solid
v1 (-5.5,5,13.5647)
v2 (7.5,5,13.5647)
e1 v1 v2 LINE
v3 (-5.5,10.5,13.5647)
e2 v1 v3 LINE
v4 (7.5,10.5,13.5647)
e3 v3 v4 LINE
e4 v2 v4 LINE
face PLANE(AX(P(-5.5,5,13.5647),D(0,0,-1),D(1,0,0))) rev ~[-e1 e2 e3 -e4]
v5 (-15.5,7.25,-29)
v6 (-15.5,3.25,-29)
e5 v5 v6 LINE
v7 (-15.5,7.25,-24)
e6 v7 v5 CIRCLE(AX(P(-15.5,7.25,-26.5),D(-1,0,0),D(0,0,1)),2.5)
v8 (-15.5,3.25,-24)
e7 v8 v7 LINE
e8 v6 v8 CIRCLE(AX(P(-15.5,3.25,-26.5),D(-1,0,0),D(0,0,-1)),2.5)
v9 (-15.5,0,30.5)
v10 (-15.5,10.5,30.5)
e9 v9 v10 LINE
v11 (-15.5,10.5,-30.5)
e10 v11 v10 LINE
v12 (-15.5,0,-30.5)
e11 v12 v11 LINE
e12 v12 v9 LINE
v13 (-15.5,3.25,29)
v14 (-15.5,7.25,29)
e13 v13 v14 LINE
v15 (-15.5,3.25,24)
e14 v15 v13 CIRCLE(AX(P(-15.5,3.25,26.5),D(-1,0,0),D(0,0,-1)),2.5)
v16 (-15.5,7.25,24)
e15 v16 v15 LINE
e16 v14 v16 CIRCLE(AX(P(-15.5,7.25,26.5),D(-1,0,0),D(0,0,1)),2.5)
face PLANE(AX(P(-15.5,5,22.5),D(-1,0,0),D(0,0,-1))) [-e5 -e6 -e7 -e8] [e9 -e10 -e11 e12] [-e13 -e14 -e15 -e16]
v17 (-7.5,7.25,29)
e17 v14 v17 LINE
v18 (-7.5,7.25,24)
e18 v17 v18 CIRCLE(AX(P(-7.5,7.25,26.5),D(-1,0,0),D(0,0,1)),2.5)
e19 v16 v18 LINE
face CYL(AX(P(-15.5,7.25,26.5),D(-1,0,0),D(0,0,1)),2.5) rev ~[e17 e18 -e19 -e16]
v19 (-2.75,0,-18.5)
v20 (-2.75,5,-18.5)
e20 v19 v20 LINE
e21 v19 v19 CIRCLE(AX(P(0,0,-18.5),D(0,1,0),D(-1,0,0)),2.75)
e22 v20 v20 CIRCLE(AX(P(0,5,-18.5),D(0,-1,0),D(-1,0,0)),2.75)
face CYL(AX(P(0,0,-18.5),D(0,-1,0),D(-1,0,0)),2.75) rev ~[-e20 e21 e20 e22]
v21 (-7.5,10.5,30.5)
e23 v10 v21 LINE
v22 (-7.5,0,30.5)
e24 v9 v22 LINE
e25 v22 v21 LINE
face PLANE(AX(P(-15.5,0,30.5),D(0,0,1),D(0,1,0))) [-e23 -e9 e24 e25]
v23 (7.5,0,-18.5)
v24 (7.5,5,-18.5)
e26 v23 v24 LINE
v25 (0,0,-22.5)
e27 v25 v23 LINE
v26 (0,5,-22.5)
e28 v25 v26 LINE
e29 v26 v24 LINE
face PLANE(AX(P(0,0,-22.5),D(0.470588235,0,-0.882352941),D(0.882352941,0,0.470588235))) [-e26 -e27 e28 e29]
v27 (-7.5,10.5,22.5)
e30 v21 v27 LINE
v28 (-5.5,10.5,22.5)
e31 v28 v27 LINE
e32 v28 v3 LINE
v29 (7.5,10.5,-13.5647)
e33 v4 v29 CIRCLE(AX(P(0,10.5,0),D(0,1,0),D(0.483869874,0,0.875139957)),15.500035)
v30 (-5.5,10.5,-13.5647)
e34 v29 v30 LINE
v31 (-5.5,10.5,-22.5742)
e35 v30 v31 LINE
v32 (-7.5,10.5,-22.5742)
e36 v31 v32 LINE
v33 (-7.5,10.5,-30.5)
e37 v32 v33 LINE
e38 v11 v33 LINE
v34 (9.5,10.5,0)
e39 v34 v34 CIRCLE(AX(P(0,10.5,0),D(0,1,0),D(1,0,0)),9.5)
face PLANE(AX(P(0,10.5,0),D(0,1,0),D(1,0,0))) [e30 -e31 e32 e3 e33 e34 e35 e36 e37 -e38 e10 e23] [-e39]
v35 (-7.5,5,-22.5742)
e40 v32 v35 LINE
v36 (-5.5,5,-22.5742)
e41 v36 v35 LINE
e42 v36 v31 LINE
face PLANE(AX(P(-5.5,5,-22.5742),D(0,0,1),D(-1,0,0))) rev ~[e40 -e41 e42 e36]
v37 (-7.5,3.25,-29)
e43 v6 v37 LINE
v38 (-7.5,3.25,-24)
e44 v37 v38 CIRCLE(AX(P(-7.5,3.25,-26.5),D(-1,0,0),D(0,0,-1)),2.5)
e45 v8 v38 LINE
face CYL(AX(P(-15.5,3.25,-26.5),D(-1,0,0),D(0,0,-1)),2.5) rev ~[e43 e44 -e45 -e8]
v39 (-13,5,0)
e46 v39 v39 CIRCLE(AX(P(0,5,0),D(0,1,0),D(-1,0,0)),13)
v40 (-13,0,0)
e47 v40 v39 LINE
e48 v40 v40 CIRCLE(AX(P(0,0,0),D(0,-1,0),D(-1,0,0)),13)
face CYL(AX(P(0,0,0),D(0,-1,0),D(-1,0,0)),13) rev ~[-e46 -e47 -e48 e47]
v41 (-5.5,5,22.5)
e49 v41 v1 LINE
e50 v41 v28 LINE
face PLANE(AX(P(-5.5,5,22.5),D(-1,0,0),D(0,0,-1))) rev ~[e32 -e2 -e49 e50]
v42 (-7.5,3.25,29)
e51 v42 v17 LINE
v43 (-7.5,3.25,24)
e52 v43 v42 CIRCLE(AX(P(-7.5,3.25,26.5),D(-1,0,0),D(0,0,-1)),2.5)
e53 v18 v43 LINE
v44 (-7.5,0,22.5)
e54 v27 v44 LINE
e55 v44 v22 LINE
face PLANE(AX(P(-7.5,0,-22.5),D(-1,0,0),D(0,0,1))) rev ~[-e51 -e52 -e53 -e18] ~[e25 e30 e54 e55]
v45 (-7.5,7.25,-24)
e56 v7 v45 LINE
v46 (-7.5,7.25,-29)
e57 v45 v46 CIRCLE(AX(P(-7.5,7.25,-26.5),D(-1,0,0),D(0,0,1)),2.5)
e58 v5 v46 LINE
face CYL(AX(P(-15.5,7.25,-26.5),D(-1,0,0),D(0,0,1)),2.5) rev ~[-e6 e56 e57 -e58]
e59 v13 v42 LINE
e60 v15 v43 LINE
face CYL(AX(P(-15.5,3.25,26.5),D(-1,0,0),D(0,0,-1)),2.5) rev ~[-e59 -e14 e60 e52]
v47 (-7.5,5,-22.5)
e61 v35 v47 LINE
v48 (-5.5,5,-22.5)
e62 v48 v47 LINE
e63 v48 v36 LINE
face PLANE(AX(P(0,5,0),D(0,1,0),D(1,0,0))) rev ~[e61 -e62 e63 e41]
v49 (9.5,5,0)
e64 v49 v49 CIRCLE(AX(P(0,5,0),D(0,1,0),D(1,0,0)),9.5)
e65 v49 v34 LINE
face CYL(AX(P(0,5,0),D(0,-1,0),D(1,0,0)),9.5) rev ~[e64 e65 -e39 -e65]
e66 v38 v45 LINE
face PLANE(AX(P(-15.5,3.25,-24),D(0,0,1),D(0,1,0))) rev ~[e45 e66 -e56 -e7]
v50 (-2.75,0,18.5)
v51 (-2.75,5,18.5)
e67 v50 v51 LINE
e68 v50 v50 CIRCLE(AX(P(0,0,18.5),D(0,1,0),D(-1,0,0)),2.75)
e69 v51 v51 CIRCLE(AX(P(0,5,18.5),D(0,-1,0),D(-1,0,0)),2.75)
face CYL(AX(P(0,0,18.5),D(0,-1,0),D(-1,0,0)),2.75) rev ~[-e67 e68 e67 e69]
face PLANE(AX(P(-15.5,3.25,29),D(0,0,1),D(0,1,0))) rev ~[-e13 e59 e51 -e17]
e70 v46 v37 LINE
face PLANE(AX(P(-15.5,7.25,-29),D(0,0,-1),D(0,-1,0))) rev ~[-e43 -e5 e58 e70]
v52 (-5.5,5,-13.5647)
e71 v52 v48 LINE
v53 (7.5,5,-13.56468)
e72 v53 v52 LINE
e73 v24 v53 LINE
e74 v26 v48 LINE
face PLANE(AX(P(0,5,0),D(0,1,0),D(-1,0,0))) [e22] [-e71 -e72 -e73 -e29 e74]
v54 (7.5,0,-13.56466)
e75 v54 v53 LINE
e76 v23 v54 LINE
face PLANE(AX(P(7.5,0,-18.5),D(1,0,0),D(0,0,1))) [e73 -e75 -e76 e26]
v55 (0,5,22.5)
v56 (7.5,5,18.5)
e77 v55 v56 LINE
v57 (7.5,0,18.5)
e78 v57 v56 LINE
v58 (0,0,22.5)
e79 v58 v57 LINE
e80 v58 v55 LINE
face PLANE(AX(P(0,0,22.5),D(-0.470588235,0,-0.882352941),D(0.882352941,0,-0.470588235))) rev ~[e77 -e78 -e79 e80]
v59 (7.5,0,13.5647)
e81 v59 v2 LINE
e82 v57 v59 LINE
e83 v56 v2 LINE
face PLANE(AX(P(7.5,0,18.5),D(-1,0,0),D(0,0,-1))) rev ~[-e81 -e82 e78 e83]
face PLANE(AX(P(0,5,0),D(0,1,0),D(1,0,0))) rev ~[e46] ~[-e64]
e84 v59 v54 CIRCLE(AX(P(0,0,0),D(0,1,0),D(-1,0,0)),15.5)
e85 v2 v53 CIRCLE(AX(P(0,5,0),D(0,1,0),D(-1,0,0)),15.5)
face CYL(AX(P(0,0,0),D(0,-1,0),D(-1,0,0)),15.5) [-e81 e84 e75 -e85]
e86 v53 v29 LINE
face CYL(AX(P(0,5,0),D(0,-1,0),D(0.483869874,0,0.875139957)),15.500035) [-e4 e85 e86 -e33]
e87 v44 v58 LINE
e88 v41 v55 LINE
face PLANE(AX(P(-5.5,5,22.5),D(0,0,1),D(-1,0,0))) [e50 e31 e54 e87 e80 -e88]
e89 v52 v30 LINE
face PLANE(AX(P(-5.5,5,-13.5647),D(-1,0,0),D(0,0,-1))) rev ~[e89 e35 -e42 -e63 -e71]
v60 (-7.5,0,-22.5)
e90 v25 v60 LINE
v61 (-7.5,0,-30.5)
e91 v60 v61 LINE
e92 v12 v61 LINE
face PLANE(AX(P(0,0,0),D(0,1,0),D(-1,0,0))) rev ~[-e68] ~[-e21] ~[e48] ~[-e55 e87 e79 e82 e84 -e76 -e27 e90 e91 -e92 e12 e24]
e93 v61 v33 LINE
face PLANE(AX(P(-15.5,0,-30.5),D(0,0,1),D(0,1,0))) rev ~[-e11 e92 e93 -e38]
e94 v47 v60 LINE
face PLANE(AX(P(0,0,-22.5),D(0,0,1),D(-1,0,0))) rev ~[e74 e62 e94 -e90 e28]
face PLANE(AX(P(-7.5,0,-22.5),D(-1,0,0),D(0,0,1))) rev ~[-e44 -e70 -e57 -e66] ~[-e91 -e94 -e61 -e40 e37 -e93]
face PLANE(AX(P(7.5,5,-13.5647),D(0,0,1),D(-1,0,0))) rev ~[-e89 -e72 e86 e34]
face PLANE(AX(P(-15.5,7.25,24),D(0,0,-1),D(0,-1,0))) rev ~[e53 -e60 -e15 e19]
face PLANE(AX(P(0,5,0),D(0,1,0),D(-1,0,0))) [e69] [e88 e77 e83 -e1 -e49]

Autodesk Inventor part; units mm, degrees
ref_plane "YZ Plane" through (0, 0, 0) normal (1, 0, 0) x (0, 1, 0)
ref_plane "XZ Plane" through (0, 0, 0) normal (0, 1, 0) x (-1, 0, 0)
ref_plane "XY Plane" through (0, 0, 0) normal (0, 0, 1) x (1, 0, 0)
sketch "Sketch1" plane through (0, 0, 0) normal (0, 1, 0) x (-1, 0, 0)
  circle A0 centre (0, 0) radius 13
  circle A1 centre (0, 0) radius 15.5
  circle A2 centre (0, 18.5) radius 2.75
  circle A3 centre (0, -18.5) radius 2.75
  line L0 (0, 18.5) -> (0, -18.5)
  line L1 (7.5, 22.5) -> (-7.5, 22.5)
  line L2 (-7.5, 22.5) -> (-7.5, 13)
  line L3 (-7.5, 13) -> (7.5, 13)
  line L4 (7.5, 13) -> (7.5, 22.5)
  line L5 (0, 22.5) -> (7.5, 18.5)
  line L6 (7.5, 18.5) -> (7.5, 13.5647)
  line L7 (0, 22.5) -> (-7.5, 18.5)
  line L8 (-7.5, 18.5) -> (-7.5, 13.5647)
  line L9 (13, 0) -> (-13, 0) construction
  circle A4 centre (0, -18.5) radius 2.75
  line L10 (7.5, -22.5) -> (-7.5, -22.5)
  line L11 (-7.5, -22.5) -> (-7.5, -13)
  line L12 (7.5, -13) -> (7.5, -22.5)
  line L13 (0, -22.5) -> (7.5, -18.5)
  line L14 (0, -22.5) -> (-7.5, -18.5)
  point P0 (-7.5, -13.5647)
  point P1 (7.5, -13.5647)
  dimension "d0" = 26
  dimension "d1" = 2.5
  dimension "d2" = 5.5
  dimension "d3" = 5.5
  dimension "d4" = 37
  dimension "d5" = 15
  dimension "d6" = 4
extrude "Extrusion1" add sketch "Sketch1" along normal blind 5 contours A0 L3 L4 A1 L0 | L3 L2 A1 L0 | A0 L0 A1 L2 L3 | L0 A1 L4 L3 | A1 L2 L7 L5 L4 | A1 L12 L13 L14 L11
sketch "Sketch2" plane through (0, 0, 0) normal (0, -1, 0) x (1, 0, 0)
  line L0 (7.5, -18.5) -> (0, -22.5) projected
  line L1 (0, -22.5) -> (-15.5, -22.5)
  line L2 (-15.5, -22.5) -> (-15.5, 22.5)
  line L3 (-15.5, 22.5) -> (0, 22.5)
  arc A0 (-7.5, 13.5647) -> (-7.5, -13.5647) centre (0, 0) ccw projected
  line L4 (-7.5, 13.5647) -> (-7.5, 18.5) projected
  line L5 (0, 22.5) -> (-7.5, 18.5)
  line L6 (-7.5, 18.5) -> (-7.5, 13.5647)
  arc A1 (-7.5, 13.5647) -> (-15.5, 0) centre (0, 0) ccw
  line L7 (0, -22.5) -> (-7.5, -18.5) projected
  line L8 (0, -22.5) -> (-7.5, -18.5)
  line L9 (-7.5, -18.5) -> (-7.5, -13.5647)
  line L10 (-7.5, -18.5) -> (-7.5, -13.5647) projected
  arc A2 (-7.5, 13.5647) -> (-7.5, -13.5647) centre (0, 0) ccw
  point P0 (-15.5, 0)
extrude "Extrusion2" add sketch "Sketch2" against normal up to surface (5 mm away)
sketch "Sketch4" plane through (0, 5, 0) normal (0, 1, 0) x (1, 0, 0)
  arc A0 (7.5, -13.5647) -> (7.5, 13.5647) centre (0, 0) ccw projected
  arc A1 (7.5, -13.5647) -> (7.5, 13.5647) centre (0, 0) ccw
  line L0 (7.5, 13.5647) -> (7.5, 18.5) projected
  line L1 (7.5, 13.5647) -> (-5.5, 13.5647)
  line L2 (-5.5, 13.5647) -> (-5.5, 22.5742)
  line L3 (-5.5, 22.5742) -> (-15.5, 22.5742)
  line L4 (-15.5, -22.5) -> (-15.5, 22.5) projected
  line L5 (-15.5, 22.5742) -> (-15.5, -22.5)
  line L6 (0, -22.5) -> (-15.5, -22.5) projected
  line L7 (-15.5, -22.5) -> (-5.5, -22.5)
  line L8 (-5.5, -22.5) -> (-5.5, -13.5647)
  line L9 (-5.5, -13.5647) -> (7.5, -13.5647)
  line L10 (7.5, -18.5) -> (7.5, -13.5647) projected
  circle A2 centre (0, 0) radius 9.5
  point P0 (-15.5, -30.5)
  point P1 (-15.5, 30.5)
  point P2 (-10, -22.5)
  point P3 (-15.5, -22.5)
  point P4 (-5.5, -22.5)
  point P5 (-5.5, -22.5)
  dimension "d21" = 13
  dimension "d22" = 13
  dimension "d23" = 19
extrude "Extrusion4" add sketch "Sketch4" along normal blind 5.5
sketch "Sketch5" plane through (-15.5, 0, -22.5) normal (-1, 0, 0) x (0, 0, 1)
  line L0 (45, 0) -> (45, 5) projected
  line L1 (45, 0) -> (53, 0)
  line L2 (53, 0) -> (53, 10.5)
  line L3 (53, 10.5) -> (45, 10.5)
  line L4 (45, 10.5) -> (45, 0)
  line L5 (4, 0) -> (0, 0) projected
  line L6 (0, 0) -> (-8, 0)
  line L7 (-8, 0) -> (-8, 10.5)
  line L8 (-8, 10.5) -> (0, 10.5)
  line L9 (0, 10.5) -> (0, 0)
  line L10 (-0.0742, 10.5) -> (45, 10.5) projected
  line L11 (-4, 3.25) -> (-4, 7.25) construction
  line L12 (-1.5, 3.25) -> (-1.5, 7.25)
  line L13 (-6.5, 7.25) -> (-6.5, 3.25)
  arc A0 (-6.5, 3.25) -> (-1.5, 3.25) centre (-4, 3.25) ccw
  arc A1 (-1.5, 7.25) -> (-6.5, 7.25) centre (-4, 7.25) ccw
  line L14 (49, 3.25) -> (49, 7.25) construction
  line L15 (51.5, 3.25) -> (51.5, 7.25)
  line L16 (46.5, 7.25) -> (46.5, 3.25)
  arc A2 (46.5, 3.25) -> (51.5, 3.25) centre (49, 3.25) ccw
  arc A3 (51.5, 7.25) -> (46.5, 7.25) centre (49, 7.25) ccw
  point P0 (22.5, 0)
  point P1 (49, 10.5)
  point P2 (0, 5.25)
  point P3 (-4, 5.25)
  point P4 (-4, 0)
  point P5 (-6.5, 5.25)
  point P6 (49, 5.25)
  point P7 (46.5, 5.25)
  point P8 (45, 5.25)
  dimension "d26" = 8
  dimension "d27" = 8
  dimension "d28" = 0
  dimension "d29" = 4
  dimension "d30" = 5
  dimension "d31" = 4
  dimension "d32" = 5
extrude "Extrusion5" add sketch "Sketch5" against normal blind 8
properties part number "clock_part1"
